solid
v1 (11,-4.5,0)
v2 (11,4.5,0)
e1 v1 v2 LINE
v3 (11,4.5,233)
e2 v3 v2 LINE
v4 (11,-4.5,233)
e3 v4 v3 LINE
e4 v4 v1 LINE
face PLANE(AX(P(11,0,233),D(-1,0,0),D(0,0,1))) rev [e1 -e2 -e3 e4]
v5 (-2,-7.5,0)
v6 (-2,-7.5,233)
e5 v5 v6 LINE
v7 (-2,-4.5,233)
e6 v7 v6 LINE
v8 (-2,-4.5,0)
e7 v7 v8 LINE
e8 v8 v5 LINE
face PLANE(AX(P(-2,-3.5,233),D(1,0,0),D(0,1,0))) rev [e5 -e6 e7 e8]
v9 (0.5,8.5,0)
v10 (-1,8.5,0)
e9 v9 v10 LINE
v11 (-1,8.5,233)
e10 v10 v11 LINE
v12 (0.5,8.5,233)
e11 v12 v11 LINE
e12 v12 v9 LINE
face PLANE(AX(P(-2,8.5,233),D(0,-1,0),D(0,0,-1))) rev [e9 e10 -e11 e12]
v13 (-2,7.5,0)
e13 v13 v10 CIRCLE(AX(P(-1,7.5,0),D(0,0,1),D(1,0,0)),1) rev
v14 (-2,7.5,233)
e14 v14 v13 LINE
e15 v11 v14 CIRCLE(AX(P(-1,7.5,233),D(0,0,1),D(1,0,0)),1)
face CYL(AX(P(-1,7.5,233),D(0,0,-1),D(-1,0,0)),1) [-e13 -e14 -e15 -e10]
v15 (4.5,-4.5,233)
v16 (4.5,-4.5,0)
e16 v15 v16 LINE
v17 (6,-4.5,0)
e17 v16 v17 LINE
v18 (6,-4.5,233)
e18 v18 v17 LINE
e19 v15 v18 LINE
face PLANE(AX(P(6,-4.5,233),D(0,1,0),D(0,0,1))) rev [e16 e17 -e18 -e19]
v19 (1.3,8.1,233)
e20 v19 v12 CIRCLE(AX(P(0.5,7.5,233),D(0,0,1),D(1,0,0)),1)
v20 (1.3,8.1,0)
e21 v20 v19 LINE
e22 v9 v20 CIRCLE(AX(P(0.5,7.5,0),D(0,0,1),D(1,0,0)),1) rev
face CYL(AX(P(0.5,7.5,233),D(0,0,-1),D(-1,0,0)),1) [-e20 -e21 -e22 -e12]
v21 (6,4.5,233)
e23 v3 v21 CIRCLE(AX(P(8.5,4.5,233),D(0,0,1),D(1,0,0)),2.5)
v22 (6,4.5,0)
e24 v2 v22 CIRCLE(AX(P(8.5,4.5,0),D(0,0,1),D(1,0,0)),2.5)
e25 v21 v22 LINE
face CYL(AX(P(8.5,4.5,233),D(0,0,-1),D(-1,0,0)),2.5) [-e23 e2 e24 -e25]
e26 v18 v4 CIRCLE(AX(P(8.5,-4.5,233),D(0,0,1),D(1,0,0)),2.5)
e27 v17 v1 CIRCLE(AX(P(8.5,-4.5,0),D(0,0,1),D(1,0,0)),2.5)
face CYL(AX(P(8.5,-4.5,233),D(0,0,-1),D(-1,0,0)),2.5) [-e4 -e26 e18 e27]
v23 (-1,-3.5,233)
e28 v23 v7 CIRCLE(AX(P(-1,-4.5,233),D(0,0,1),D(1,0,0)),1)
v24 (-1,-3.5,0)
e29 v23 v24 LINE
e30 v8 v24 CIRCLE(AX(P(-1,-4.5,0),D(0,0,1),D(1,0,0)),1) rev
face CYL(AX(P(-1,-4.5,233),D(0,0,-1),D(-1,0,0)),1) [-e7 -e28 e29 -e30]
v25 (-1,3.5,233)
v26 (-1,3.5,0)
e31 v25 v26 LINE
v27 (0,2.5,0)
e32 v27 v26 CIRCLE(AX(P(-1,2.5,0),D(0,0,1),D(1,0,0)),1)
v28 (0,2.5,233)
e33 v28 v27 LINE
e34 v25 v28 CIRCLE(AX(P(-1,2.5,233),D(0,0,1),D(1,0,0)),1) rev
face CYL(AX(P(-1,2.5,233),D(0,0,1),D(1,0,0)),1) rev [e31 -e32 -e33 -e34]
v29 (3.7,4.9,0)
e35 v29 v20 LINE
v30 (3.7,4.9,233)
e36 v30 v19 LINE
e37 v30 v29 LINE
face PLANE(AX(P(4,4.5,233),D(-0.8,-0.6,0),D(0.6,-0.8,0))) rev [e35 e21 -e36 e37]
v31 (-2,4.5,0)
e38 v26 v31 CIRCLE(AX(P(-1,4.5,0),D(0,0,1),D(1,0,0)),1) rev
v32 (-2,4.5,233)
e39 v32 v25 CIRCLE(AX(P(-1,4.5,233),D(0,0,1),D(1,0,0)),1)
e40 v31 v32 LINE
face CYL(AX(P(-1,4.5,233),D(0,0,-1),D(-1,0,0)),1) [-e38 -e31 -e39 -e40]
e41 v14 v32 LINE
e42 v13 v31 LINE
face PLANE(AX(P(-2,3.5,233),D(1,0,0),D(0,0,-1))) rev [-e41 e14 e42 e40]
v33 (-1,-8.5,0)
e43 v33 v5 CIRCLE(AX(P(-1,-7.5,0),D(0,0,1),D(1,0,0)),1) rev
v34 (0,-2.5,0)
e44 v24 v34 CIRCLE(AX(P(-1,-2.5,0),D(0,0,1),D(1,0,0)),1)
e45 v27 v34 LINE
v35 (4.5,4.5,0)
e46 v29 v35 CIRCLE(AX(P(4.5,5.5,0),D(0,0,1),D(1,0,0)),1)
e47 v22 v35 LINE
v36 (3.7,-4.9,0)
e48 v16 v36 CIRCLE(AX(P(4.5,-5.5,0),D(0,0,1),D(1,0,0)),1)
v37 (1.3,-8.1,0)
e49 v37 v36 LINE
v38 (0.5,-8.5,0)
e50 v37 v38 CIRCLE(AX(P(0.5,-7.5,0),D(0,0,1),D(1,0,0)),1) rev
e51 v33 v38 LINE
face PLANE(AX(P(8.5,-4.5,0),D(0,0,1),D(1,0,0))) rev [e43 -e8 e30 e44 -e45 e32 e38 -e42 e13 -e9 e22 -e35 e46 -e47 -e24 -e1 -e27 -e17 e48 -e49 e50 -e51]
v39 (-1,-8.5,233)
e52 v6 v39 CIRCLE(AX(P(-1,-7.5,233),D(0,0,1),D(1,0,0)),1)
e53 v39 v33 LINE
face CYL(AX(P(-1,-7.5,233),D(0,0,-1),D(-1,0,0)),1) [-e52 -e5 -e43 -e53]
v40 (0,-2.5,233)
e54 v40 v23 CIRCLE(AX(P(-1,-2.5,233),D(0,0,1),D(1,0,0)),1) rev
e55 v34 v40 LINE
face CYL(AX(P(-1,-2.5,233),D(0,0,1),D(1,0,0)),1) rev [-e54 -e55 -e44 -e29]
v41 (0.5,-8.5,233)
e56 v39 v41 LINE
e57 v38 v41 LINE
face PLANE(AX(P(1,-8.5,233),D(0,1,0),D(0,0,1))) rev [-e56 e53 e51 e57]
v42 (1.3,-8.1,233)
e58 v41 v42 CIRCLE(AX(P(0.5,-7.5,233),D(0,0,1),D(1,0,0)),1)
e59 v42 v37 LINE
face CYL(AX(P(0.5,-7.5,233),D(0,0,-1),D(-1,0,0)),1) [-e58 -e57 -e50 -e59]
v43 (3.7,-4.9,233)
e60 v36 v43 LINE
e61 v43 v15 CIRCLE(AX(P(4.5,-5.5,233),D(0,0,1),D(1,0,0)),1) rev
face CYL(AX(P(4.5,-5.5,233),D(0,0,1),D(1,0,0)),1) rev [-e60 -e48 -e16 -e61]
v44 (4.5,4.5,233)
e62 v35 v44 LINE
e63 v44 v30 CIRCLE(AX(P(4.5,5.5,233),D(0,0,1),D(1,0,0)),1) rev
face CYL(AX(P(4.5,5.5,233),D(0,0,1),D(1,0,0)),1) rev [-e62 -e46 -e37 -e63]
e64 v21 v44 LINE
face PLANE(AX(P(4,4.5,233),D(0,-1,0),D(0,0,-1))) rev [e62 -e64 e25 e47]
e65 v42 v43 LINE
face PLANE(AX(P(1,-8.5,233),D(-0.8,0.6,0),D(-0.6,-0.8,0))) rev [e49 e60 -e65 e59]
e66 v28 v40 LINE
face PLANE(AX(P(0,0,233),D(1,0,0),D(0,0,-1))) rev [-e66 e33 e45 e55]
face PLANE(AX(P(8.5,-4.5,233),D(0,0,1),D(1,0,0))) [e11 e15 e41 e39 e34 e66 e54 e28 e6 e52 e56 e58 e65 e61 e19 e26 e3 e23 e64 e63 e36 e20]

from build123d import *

# Parameters (mm, degrees)
BOSS_EXTRUDE1_DEPTH = 233
FILLET1_R           = 1


with BuildPart() as part:
    # Sketch1 → Boss-Extrude1 (new body)
    with BuildSketch(Plane.XY):
        with BuildLine():
            Line((0, 0), (0, 3.5))
            Line((0, 3.5), (-2, 3.5))
            Line((-2, 3.5), (-2, 8.5))
            Line((-2, 8.5), (1, 8.5))
            Line((1, 8.5), (4, 4.5))
            Line((4, 4.5), (6, 4.5))
            ThreePointArc((6, 4.5), (8.5, 7), (11, 4.5))
            Line((11, 4.5), (11, 0))
            Line((11, 0), (11, -4.5))
            ThreePointArc((11, -4.5), (8.5, -7), (6, -4.5))
            Line((6, -4.5), (4, -4.5))
            Line((4, -4.5), (1, -8.5))
            Line((1, -8.5), (-2, -8.5))
            Line((-2, -8.5), (-2, -3.5))
            Line((-2, -3.5), (0, -3.5))
            Line((0, -3.5), (0, 0))
        make_face()
    extrude(amount=BOSS_EXTRUDE1_DEPTH)

    # Fillet1
    fillet1_edges = [part.edges().sort_by_distance(p)[0] for p in [
        (4, -4.5, 116.5),
        (1, -8.5, 116.5),
        (-2, -8.5, 116.5),
        (-2, -3.5, 116.5),
        (0, -3.5, 116.5),
        (0, 3.5, 116.5),
        (-2, 3.5, 116.5),
        (-2, 8.5, 116.5),
        (1, 8.5, 116.5),
        (4, 4.5, 116.5),
    ]]
    fillet(fillet1_edges, radius=FILLET1_R - 0.0001)  # a hair under: the kernel refuses the full size


solid = part.part
